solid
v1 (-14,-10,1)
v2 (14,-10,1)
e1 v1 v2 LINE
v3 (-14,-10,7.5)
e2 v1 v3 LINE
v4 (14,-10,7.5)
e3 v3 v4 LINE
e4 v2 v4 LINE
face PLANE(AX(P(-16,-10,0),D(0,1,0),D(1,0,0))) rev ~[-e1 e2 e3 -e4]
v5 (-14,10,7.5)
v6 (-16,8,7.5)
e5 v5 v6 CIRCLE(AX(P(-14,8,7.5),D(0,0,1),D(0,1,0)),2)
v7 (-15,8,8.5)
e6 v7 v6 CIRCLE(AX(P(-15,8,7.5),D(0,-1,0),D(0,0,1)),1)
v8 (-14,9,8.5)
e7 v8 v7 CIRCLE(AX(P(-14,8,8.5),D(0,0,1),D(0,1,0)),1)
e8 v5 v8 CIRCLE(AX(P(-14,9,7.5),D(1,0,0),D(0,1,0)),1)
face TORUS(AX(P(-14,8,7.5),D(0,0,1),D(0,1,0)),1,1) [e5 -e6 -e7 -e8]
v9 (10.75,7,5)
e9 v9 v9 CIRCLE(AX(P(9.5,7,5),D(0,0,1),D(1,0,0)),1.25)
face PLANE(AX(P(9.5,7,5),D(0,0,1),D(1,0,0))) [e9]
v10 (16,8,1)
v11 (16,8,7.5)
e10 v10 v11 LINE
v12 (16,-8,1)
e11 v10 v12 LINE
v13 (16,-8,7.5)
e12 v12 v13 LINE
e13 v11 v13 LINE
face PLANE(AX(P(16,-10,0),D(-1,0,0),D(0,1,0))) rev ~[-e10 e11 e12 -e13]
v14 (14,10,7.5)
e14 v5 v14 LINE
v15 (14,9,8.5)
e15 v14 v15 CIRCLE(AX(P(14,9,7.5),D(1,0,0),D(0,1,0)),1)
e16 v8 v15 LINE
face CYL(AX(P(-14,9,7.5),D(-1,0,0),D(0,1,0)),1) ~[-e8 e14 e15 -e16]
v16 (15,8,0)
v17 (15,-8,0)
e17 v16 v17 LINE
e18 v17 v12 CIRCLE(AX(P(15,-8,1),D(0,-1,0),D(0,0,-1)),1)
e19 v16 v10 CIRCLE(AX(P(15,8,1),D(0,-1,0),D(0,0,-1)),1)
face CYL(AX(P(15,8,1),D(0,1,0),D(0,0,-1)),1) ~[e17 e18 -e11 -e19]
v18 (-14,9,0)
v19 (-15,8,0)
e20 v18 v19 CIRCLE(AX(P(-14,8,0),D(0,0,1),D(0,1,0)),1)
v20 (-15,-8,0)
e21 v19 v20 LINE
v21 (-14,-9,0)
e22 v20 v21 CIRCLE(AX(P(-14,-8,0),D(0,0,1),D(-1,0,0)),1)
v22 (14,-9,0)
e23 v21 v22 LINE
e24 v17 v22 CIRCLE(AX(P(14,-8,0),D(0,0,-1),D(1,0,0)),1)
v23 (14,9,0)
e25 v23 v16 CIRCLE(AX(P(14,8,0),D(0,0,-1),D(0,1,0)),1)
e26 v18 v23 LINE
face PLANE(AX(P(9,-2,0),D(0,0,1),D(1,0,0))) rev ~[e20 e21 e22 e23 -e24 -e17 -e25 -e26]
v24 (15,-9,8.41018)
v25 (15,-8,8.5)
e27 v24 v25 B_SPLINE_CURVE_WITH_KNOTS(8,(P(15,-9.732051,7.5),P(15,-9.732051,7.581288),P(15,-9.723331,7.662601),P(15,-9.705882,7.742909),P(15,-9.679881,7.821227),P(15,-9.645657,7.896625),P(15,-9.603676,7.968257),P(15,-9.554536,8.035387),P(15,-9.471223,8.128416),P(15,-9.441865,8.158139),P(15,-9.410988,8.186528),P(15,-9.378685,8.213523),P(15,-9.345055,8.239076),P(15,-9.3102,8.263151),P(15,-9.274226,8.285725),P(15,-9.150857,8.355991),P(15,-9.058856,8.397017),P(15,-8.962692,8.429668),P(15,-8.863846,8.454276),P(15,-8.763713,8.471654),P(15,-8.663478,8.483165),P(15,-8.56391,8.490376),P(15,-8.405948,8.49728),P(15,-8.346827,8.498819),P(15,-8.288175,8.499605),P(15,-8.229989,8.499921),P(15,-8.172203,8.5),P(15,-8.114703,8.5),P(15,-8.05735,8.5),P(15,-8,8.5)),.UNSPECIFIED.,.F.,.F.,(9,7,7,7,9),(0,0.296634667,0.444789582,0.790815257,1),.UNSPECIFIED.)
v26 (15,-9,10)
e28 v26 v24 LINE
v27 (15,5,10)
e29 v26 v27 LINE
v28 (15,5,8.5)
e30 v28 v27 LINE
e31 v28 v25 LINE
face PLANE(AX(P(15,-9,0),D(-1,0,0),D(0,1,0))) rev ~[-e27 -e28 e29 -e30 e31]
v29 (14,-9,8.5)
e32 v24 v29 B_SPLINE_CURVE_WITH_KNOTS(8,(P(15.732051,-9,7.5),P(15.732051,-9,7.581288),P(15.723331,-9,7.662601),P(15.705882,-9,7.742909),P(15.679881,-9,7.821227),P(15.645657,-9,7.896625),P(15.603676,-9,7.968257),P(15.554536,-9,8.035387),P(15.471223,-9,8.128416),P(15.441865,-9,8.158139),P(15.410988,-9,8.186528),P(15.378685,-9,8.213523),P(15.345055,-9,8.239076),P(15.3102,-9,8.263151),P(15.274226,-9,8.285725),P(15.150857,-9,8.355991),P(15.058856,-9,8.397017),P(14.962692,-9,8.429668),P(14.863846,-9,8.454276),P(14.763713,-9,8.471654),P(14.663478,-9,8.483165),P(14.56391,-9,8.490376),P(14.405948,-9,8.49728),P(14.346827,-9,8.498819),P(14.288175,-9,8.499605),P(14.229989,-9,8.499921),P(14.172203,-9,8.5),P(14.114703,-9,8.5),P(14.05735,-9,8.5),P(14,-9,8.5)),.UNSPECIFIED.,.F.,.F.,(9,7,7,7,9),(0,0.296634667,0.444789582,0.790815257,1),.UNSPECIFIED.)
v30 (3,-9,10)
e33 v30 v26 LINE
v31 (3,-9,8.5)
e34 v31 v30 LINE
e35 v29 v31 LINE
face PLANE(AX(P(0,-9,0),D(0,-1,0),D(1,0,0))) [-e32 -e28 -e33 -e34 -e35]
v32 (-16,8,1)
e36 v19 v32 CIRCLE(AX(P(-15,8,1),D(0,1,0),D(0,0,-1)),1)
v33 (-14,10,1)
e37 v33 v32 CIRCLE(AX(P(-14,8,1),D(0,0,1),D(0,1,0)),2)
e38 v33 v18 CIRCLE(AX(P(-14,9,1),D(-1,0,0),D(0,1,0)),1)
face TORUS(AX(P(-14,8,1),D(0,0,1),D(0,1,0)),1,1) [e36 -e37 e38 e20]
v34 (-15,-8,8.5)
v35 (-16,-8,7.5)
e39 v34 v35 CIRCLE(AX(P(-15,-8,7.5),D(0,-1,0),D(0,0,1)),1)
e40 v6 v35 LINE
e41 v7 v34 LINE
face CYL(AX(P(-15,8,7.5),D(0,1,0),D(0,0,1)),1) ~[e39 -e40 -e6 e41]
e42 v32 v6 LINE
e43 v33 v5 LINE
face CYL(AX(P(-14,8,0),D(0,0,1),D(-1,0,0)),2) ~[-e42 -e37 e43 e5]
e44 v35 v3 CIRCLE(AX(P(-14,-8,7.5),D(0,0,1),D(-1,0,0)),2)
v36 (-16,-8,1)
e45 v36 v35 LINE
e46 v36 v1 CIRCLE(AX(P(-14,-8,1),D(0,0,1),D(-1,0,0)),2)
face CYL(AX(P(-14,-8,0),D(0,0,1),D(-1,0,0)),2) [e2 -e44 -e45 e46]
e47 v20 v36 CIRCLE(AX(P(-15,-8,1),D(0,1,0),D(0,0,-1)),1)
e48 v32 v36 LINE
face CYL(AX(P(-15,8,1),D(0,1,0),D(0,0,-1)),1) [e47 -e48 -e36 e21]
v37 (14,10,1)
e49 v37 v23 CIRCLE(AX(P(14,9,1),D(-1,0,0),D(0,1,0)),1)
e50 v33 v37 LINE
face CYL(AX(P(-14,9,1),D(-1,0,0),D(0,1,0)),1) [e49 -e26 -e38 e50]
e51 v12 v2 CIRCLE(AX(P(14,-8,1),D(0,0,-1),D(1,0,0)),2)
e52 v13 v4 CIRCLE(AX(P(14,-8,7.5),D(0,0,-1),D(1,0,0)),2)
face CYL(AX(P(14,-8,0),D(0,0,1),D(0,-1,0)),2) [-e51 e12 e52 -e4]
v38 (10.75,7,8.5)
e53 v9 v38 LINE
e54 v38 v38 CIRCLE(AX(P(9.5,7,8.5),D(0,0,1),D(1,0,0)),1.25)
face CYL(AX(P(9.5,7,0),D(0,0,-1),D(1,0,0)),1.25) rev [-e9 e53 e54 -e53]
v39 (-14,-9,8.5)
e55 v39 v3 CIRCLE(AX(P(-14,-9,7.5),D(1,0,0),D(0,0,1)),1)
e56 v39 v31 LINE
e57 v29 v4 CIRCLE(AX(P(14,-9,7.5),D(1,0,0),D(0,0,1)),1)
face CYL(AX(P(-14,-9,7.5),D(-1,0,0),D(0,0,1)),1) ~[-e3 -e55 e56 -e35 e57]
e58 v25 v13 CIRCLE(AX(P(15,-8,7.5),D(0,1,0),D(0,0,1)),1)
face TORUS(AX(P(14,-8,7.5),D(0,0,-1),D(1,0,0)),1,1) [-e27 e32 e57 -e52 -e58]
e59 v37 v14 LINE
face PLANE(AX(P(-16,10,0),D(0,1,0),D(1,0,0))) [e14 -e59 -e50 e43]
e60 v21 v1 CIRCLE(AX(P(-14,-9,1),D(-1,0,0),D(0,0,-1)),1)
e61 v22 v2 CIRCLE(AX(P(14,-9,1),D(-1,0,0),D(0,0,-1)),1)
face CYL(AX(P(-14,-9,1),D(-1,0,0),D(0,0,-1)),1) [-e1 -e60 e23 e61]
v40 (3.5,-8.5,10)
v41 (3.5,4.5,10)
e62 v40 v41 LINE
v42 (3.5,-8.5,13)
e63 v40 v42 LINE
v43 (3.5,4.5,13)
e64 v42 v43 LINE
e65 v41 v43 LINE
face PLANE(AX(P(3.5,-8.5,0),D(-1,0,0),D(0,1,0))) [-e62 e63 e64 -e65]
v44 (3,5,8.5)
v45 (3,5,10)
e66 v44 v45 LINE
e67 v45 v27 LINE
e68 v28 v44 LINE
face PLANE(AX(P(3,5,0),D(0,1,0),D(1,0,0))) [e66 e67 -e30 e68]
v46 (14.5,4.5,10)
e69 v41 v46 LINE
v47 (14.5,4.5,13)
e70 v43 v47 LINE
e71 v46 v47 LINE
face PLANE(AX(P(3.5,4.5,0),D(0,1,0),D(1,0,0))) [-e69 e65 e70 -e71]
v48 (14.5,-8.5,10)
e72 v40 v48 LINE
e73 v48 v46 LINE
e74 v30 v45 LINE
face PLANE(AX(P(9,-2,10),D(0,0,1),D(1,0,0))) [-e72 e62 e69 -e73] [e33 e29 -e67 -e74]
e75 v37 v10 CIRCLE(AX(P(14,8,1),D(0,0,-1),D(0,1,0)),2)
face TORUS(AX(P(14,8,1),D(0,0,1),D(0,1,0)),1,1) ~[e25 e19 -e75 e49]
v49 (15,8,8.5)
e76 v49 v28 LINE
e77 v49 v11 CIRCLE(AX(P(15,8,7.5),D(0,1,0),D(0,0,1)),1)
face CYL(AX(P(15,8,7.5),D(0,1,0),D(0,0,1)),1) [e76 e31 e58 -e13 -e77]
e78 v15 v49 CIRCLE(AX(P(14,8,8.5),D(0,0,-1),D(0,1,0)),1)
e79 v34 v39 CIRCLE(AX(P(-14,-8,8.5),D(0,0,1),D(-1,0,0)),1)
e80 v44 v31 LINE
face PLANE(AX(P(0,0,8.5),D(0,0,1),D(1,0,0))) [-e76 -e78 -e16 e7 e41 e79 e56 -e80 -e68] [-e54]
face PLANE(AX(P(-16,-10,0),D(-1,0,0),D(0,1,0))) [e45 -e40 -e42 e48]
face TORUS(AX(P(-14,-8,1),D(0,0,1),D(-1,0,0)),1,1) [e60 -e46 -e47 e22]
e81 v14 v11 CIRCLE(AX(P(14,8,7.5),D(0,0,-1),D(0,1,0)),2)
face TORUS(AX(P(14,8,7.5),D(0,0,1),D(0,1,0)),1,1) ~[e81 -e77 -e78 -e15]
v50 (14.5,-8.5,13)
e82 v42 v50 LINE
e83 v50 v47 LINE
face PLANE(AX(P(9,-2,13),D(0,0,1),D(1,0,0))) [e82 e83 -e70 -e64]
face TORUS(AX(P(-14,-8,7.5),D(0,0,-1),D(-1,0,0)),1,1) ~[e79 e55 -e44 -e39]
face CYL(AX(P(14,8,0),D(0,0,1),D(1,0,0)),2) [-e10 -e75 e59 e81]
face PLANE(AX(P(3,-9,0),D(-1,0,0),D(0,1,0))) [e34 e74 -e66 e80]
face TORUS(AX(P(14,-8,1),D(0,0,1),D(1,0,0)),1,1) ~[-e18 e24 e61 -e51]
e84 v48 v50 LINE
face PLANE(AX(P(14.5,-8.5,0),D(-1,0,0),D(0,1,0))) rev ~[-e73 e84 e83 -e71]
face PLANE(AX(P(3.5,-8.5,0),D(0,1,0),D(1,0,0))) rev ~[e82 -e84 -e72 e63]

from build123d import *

# Parameters (mm, degrees)
F0_W         = 32
F0_H         = 20
F0_W_2       = 12
F0_H_2       = 14
F0_R         = 1.25
F0_W_3       = 11
F0_H_3       = 13
F1_DEPTH     = 8.5
F2_DEPTH     = 5
F3_R         = 2
F4_DEPTH     = 13
F5_DEPTH     = 10
F6_T1_DEPTH  = 28
F6_T3_DEPTH  = 16
F6_T6_ANGLE  = 90
F6_T8_ANGLE  = 90
F6_T10_ANGLE = 90
F6_T12_ANGLE = 90
F6_T14_ANGLE = 90
F6_T16_ANGLE = 90
F6_T20_ANGLE = 90
F6_T26_ANGLE = 90
F6_T32_ANGLE = 90
F6_T36_ANGLE = 90


# Not quite as in the source:
# - a fillet or chamfer that OpenCascade refuses, or shapes differently, is made with other operations: its cross-section is extruded or revolved along the edge and cut away or added


with BuildPart() as f1:
    # F0 (on Top) → F1 (new body)
    with BuildSketch(Plane.XY):
        Rectangle(F0_W, F0_H)
        with Locations((9, -2)):
            Rectangle(F0_W_2, F0_H_2, mode=Mode.SUBTRACT)
        with Locations((9.5, 7)):
            Circle(F0_R, mode=Mode.SUBTRACT)
        with Locations((9, -2)):
            Rectangle(F0_W_2, F0_H_2)
        with Locations((9, -2)):
            Rectangle(F0_W_3, F0_H_3, mode=Mode.SUBTRACT)
        with Locations((9, -2)):
            Rectangle(F0_W_3, F0_H_3)
    extrude(amount=F1_DEPTH)

    # F0 (on Top) → F2 (join)
    with BuildSketch(Plane.XY):
        with Locations((9.5, 7)):
            Circle(F0_R)
    extrude(amount=F2_DEPTH)

    # F3
    f3_edges = [f1.edges().sort_by_distance(p)[0] for p in [
        (-16, 10, 4.25),
        (-16, -10, 4.25),
        (16, -10, 4.25),
        (16, 10, 4.25),
    ]]
    fillet(f3_edges, radius=F3_R)

    # F0 (on Top) → F4 (join)
    with BuildSketch(Plane.XY):
        with Locations((9, -2)):
            Rectangle(F0_W_3, F0_H_3)
    extrude(amount=F4_DEPTH)

    # F0 (on Top) → F5 (join)
    with BuildSketch(Plane.XY):
        with Locations((9, -2)):
            Rectangle(F0_W_2, F0_H_2)
        with Locations((9, -2)):
            Rectangle(F0_W_3, F0_H_3, mode=Mode.SUBTRACT)
    extrude(amount=F5_DEPTH)

    # F6: fillet of radius 1 on 18 edges, made by hand

    # F6_s2 → F6_t1 (cut)
    with BuildSketch(Plane.YZ.offset(-14)):
        with BuildLine():
            ThreePointArc((-9, 0), (-9.7071067812, 0.2928932188), (-10, 1))
            Line((-10, 1), (-10, 0))
            Line((-10, 0), (-9, 0))
        make_face()
        with BuildLine():
            ThreePointArc((-9, 8.5), (-9.7071067812, 8.2071067812), (-10, 7.5))
            Line((-10, 7.5), (-10, 8.5))
            Line((-10, 8.5), (-9, 8.5))
        make_face()
        with BuildLine():
            ThreePointArc((10, 1), (9.7071067812, 0.2928932188), (9, 0))
            Line((9, 0), (10, 0))
            Line((10, 0), (10, 1))
        make_face()
        with BuildLine():
            ThreePointArc((10, 7.5), (9.7071067812, 8.2071067812), (9, 8.5))
            Line((9, 8.5), (10, 8.5))
            Line((10, 8.5), (10, 7.5))
        make_face()
    extrude(amount=F6_T1_DEPTH, mode=Mode.SUBTRACT)

    # F6_s4 → F6_t3 (cut)
    with BuildSketch(Plane.XZ.offset(-8)):
        with BuildLine():
            ThreePointArc((-15, 0), (-15.7071067812, 0.2928932188), (-16, 1))
            Line((-16, 1), (-16, 0))
            Line((-16, 0), (-15, 0))
        make_face()
        with BuildLine():
            ThreePointArc((15, 0), (15.7071067812, 0.2928932188), (16, 1))
            Line((16, 1), (16, 0))
            Line((16, 0), (15, 0))
        make_face()
        with BuildLine():
            ThreePointArc((15, 8.5), (15.7071067812, 8.2071067812), (16, 7.5))
            Line((16, 7.5), (16, 8.5))
            Line((16, 8.5), (15, 8.5))
        make_face()
        with BuildLine():
            ThreePointArc((-15, 8.5), (-15.7071067812, 8.2071067812), (-16, 7.5))
            Line((-16, 7.5), (-16, 8.5))
            Line((-16, 8.5), (-15, 8.5))
        make_face()
    extrude(amount=F6_T3_DEPTH, mode=Mode.SUBTRACT)

    # F6_s5 → F6_t6 (revolve, cut)
    with BuildSketch(Plane.YZ.offset(-14)):
        with BuildLine():
            ThreePointArc((9, 0), (9.7071067812, 0.2928932188), (10, 1))
            Line((10, 1), (10, 0))
            Line((10, 0), (9, 0))
        make_face()
    revolve(axis=Axis((-14, 8, 0), (0, 0, 1)), revolution_arc=F6_T6_ANGLE, mode=Mode.SUBTRACT)

    # F6_s7 → F6_t8 (revolve, cut)
    with BuildSketch(Plane.XZ.offset(8)):
        with BuildLine():
            ThreePointArc((-15, 0), (-15.7071067812, 0.2928932188), (-16, 1))
            Line((-16, 1), (-16, 0))
            Line((-16, 0), (-15, 0))
        make_face()
    revolve(axis=Axis((-14, -8, 0), (0, 0, 1)), revolution_arc=F6_T8_ANGLE, mode=Mode.SUBTRACT)

    # F6_s9 → F6_t10 (revolve, cut)
    with BuildSketch(Plane.XZ.offset(8)):
        with BuildLine():
            ThreePointArc((15, 0), (15.7071067812, 0.2928932188), (16, 1))
            Line((16, 1), (16, 0))
            Line((16, 0), (15, 0))
        make_face()
    revolve(axis=Axis((14, -8, 0), (0, 0, -1)), revolution_arc=F6_T10_ANGLE, mode=Mode.SUBTRACT)

    # F6_s11 → F6_t12 (revolve, cut)
    with BuildSketch(Plane.YZ.offset(14)):
        with BuildLine():
            ThreePointArc((9, 0), (9.7071067812, 0.2928932188), (10, 1))
            Line((10, 1), (10, 0))
            Line((10, 0), (9, 0))
        make_face()
    revolve(axis=Axis((14, 8, 0), (0, 0, -1)), revolution_arc=F6_T12_ANGLE, mode=Mode.SUBTRACT)

    # F6_s13 → F6_t14 (revolve, cut)
    with BuildSketch(Plane.YZ.offset(14)):
        with BuildLine():
            ThreePointArc((10, 7.5), (9.7071067812, 8.2071067812), (9, 8.5))
            Line((9, 8.5), (10, 8.5))
            Line((10, 8.5), (10, 7.5))
        make_face()
    revolve(axis=Axis((14, 8, 8.5), (0, 0, -1)), revolution_arc=F6_T14_ANGLE, mode=Mode.SUBTRACT)

    # F6_s15 → F6_t16 (revolve, cut)
    with BuildSketch(Plane.YZ.offset(-14)):
        with BuildLine():
            ThreePointArc((10, 7.5), (9.7071067812, 8.2071067812), (9, 8.5))
            Line((9, 8.5), (10, 8.5))
            Line((10, 8.5), (10, 7.5))
        make_face()
    revolve(axis=Axis((-14, 8, 8.5), (0, 0, 1)), revolution_arc=F6_T16_ANGLE, mode=Mode.SUBTRACT)


with BuildPart() as f6_tool18:
    # F6_s19 → F6_t20 (revolve)
    with BuildSketch(Plane.XZ.offset(8)):
        with BuildLine():
            ThreePointArc((15, 8.5), (15.7071067812, 8.2071067812), (16, 7.5))
            Line((16, 7.5), (16, 8.5))
            Line((16, 8.5), (15, 8.5))
        make_face()
    revolve(axis=Axis((14, -8, 8.5), (0, 0, -1)), revolution_arc=F6_T20_ANGLE)

    split(bisect_by=Plane.YZ.offset(15), keep=Keep.TOP)

    split(bisect_by=Plane.XZ.offset(9), keep=Keep.BOTTOM)


with BuildPart() as f1_1:
    add(f1.part)

    # F6_t17: cut F6_tool18
    add(f6_tool18.part, mode=Mode.SUBTRACT)


with BuildPart() as f6_tool24:
    # F6_s25 → F6_t26 (revolve)
    with BuildSketch(Plane.XZ.offset(8)):
        with BuildLine():
            ThreePointArc((15, 8.5), (15.7071067812, 8.2071067812), (16, 7.5))
            Line((16, 7.5), (16, 8.5))
            Line((16, 8.5), (15, 8.5))
        make_face()
    revolve(axis=Axis((14, -8, 8.5), (0, 0, -1)), revolution_arc=F6_T26_ANGLE)

    split(bisect_by=Plane.YZ.offset(15), keep=Keep.BOTTOM)

    split(bisect_by=Plane.XZ.offset(9), keep=Keep.TOP)


with BuildPart() as f1_2:
    add(f1_1.part)

    # F6_t23: cut F6_tool24
    add(f6_tool24.part, mode=Mode.SUBTRACT)


with BuildPart() as f6_tool30:
    # F6_s31 → F6_t32 (revolve)
    with BuildSketch(Plane.XZ.offset(8)):
        with BuildLine():
            ThreePointArc((15, 8.5), (15.7071067812, 8.2071067812), (16, 7.5))
            Line((16, 7.5), (16, 8.5))
            Line((16, 8.5), (15, 8.5))
        make_face()
    revolve(axis=Axis((14, -8, 8.5), (0, 0, -1)), revolution_arc=F6_T32_ANGLE)

    split(bisect_by=Plane.YZ.offset(15), keep=Keep.TOP)

    split(bisect_by=Plane.XZ.offset(9), keep=Keep.TOP)


with BuildPart() as f1_3:
    add(f1_2.part)

    # F6_t29: cut F6_tool30
    add(f6_tool30.part, mode=Mode.SUBTRACT)

    # F6_s35 → F6_t36 (revolve, cut)
    with BuildSketch(Plane.XZ.offset(8)):
        with BuildLine():
            ThreePointArc((-15, 8.5), (-15.7071067812, 8.2071067812), (-16, 7.5))
            Line((-16, 7.5), (-16, 8.5))
            Line((-16, 8.5), (-15, 8.5))
        make_face()
    revolve(axis=Axis((-14, -8, 8.5), (0, 0, 1)), revolution_arc=F6_T36_ANGLE, mode=Mode.SUBTRACT)


solid = f1_3.part
